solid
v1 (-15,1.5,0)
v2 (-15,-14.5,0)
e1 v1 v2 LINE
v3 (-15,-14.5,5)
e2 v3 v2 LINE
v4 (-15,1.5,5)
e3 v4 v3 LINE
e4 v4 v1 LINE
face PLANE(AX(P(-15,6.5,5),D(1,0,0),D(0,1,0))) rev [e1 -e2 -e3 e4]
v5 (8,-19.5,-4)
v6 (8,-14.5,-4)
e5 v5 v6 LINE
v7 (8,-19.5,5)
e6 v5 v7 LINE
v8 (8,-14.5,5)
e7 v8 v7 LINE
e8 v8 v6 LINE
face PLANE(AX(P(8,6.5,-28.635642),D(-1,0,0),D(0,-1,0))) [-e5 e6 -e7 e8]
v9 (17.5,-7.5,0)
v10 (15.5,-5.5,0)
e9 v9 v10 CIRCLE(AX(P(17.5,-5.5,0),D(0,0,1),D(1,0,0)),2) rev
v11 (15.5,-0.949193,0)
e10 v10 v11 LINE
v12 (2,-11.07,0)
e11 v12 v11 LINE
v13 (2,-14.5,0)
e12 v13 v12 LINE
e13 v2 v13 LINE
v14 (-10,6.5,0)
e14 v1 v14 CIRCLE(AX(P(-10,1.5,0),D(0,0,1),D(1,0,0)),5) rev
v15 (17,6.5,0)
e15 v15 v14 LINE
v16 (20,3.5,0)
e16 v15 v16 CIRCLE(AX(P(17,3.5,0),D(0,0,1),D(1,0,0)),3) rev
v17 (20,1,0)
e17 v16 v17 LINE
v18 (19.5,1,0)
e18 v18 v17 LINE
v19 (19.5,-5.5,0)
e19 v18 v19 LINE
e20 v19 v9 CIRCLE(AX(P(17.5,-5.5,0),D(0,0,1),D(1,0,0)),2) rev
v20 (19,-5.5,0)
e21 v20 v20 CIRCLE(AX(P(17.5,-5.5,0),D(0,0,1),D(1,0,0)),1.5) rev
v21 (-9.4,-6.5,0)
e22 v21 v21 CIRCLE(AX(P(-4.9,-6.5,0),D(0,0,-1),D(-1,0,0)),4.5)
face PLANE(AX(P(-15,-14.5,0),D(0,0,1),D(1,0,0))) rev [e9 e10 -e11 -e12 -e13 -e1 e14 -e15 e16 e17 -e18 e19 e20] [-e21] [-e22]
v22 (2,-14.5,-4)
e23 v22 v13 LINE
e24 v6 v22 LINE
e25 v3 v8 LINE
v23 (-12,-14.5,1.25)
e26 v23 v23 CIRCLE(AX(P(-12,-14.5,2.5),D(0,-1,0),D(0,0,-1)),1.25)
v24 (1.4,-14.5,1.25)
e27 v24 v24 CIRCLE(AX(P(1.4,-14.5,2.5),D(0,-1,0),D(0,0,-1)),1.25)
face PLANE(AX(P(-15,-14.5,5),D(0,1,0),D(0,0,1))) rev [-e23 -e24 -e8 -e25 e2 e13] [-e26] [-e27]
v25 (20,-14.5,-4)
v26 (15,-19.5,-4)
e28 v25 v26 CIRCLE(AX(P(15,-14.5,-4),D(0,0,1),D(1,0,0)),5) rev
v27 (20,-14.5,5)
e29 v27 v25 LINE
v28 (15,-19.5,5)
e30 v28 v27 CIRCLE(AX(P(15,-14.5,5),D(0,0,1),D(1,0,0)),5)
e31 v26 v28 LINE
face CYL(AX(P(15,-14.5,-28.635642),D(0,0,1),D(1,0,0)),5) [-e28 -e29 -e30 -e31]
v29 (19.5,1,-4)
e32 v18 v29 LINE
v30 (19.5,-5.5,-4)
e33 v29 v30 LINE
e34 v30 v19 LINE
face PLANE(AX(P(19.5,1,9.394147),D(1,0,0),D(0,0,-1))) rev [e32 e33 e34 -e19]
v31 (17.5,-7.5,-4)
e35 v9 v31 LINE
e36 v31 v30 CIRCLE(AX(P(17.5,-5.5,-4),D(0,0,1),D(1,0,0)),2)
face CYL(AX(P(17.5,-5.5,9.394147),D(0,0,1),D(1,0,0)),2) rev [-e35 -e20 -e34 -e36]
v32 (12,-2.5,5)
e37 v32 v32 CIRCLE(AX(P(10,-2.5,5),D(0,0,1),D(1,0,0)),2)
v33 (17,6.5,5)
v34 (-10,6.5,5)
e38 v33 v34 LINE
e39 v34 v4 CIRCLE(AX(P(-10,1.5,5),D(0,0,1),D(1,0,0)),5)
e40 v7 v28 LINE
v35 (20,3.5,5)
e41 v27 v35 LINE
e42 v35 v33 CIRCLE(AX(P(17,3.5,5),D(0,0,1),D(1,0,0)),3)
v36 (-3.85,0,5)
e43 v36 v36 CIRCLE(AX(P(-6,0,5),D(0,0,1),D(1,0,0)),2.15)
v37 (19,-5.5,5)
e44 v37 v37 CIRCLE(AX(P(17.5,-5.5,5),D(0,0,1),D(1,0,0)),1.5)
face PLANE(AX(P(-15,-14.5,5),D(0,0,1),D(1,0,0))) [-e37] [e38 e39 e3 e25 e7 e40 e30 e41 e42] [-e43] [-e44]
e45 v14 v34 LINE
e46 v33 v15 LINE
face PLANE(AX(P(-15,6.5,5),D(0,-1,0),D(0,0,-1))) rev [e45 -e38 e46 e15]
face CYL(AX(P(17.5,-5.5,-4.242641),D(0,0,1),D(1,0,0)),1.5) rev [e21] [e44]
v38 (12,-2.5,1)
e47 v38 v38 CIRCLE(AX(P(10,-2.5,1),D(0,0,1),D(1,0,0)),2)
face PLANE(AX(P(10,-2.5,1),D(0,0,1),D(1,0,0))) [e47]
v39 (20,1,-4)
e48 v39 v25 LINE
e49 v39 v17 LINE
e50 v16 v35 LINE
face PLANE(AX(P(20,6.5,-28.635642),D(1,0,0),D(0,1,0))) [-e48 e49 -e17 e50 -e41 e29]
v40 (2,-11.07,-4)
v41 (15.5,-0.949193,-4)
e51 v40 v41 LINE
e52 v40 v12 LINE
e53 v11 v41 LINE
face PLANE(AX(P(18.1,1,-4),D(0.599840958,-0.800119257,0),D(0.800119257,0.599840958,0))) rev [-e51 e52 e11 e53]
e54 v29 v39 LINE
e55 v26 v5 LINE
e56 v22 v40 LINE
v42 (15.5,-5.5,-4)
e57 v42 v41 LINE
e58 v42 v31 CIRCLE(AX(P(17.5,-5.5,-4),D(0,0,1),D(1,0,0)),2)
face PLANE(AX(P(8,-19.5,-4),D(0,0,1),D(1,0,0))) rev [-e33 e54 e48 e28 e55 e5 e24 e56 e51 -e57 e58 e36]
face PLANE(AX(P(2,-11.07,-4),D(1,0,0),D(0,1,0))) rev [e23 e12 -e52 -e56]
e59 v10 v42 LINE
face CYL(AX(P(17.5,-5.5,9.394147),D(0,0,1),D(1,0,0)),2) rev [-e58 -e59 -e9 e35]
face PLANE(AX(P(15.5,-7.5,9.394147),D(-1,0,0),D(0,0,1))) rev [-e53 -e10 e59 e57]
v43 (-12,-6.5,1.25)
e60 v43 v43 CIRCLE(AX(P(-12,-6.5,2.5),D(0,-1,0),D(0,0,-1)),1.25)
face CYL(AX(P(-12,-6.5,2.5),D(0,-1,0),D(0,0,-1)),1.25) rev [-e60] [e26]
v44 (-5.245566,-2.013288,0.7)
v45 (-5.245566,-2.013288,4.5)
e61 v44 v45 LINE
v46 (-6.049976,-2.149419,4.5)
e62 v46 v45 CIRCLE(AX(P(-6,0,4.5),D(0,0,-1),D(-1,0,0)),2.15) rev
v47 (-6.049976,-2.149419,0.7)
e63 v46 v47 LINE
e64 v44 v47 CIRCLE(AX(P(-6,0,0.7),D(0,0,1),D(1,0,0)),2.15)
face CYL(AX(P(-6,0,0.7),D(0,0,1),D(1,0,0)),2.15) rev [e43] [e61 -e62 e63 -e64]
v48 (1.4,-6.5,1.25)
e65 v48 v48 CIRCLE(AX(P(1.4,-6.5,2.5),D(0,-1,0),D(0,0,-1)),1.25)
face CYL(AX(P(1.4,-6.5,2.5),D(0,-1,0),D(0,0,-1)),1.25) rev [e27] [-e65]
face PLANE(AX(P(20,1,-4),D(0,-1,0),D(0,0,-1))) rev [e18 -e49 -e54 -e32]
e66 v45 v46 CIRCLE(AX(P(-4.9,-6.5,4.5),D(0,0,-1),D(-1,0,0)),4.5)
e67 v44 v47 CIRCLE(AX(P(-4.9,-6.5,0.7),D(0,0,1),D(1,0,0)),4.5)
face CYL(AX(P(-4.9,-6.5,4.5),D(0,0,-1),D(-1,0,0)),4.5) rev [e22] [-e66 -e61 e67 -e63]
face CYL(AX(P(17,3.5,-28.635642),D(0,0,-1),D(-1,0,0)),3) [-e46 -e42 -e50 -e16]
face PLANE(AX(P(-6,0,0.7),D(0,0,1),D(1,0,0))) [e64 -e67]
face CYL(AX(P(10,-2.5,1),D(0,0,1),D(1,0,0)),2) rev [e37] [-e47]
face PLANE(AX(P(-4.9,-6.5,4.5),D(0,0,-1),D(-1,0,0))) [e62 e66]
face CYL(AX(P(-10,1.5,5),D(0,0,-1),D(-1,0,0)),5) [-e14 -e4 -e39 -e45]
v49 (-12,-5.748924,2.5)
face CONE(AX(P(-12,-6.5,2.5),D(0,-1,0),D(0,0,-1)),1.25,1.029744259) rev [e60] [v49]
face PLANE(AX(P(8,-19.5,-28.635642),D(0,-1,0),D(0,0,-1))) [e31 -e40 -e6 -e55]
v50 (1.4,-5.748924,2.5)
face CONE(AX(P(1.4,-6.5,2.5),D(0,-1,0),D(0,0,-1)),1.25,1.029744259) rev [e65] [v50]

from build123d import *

# Parameters (mm, degrees)
SKETCH1_W             = 23
SKETCH1_H             = 21
EXTRUDE1_DEPTH        = 5
SKETCH2_R             = 2.15
EXTRUDE2_DEPTH        = 4.3
SKETCH3_R             = 4.5
EXTRUDE3_DEPTH        = 4.5
SKETCH4_R             = 1.25
EXTRUDE4_DEPTH        = 8
SKETCH7_W             = 12
SKETCH7_H             = 26
EXTRUDE6_DEPTH        = 5
SKETCH9_R             = 1.5
EXTRUDE8_DEPTH        = 5
SKETCH8_R             = 2
EXTRUDE7_DEPTH        = 4
FILLET2_R             = 3
M3_TAPPED_HOLE1_D     = 2.5
M3_TAPPED_HOLE1_DEPTH = 8
M3_TAPPED_HOLE1_TIP   = 0.751075774
EXTRUDE9_DEPTH        = 4
FILLET1_R             = 5
EXTRUDE10_DEPTH       = 4
FILLET3_R             = 2


with BuildPart() as part:
    # Sketch1 → Extrude1 (new body)
    with BuildSketch(Plane.XY):
        with Locations((-3.5, -4)):
            Rectangle(SKETCH1_W, SKETCH1_H)
    extrude(amount=EXTRUDE1_DEPTH)

    # Sketch2 → Extrude2 (cut)
    with BuildSketch(Plane.XY.offset(5)):
        with Locations((-6, 0)):
            Circle(SKETCH2_R)
    extrude(amount=-EXTRUDE2_DEPTH, mode=Mode.SUBTRACT)

    # Sketch3 → Extrude3 (cut)
    with BuildSketch(Plane(origin=(0, 0, 0), x_dir=(-1, 0, 0), z_dir=(0, 0, -1))):
        with Locations((4.9, -6.5)):
            Circle(SKETCH3_R)
    extrude(amount=-EXTRUDE3_DEPTH, mode=Mode.SUBTRACT)

    # Sketch4 → Extrude4 (cut)
    with BuildSketch(Plane.XZ.offset(14.5)):
        with Locations(Location((-12, 2.5, 0), (0, 0, 270))):
            Circle(SKETCH4_R)
        with Locations(Location((1.4, 2.5, 0), (0, 0, 270))):
            Circle(SKETCH4_R)
    extrude(amount=-EXTRUDE4_DEPTH, mode=Mode.SUBTRACT)

    # Sketch7 → Extrude6 (add)
    with BuildSketch(Plane.XY.offset(5)):
        with Locations((14, -6.5)):
            Rectangle(SKETCH7_W, SKETCH7_H)
    extrude(amount=-EXTRUDE6_DEPTH)

    # Sketch9 → Extrude8 (cut)
    with BuildSketch(Plane.XY.offset(5)):
        with Locations((17.5, -5.5)):
            Circle(SKETCH9_R)
    extrude(amount=-EXTRUDE8_DEPTH, mode=Mode.SUBTRACT)

    # Sketch8 → Extrude7 (cut)
    with BuildSketch(Plane.XY.offset(5)):
        with Locations((10, -2.5)):
            Circle(SKETCH8_R)
    extrude(amount=-EXTRUDE7_DEPTH, mode=Mode.SUBTRACT)

    # Fillet2
    fillet2_edges = [part.edges().sort_by_distance(p)[0] for p in [
        (20, 6.5, 2.5),
        (20, -19.5, 2.5),
    ]]
    fillet(fillet2_edges, radius=FILLET2_R)

    # M3 Tapped Hole1
    with Locations(Plane(origin=(-12, -14.5, 2.5), x_dir=(0, 0, -1), z_dir=(0, -1, 0))):
        with Locations((0, 0), (0, 13.4)):
            Hole(M3_TAPPED_HOLE1_D / 2, depth=M3_TAPPED_HOLE1_DEPTH)
            with Locations((0, 0, -(M3_TAPPED_HOLE1_DEPTH + M3_TAPPED_HOLE1_TIP / 2))):  # 118° drill point
                Cone(0, M3_TAPPED_HOLE1_D / 2, M3_TAPPED_HOLE1_TIP, mode=Mode.SUBTRACT)

    # Sketch11 → Extrude9 (add)
    with BuildSketch(Plane(origin=(0, 0, 0), x_dir=(-1, 0, 0), z_dir=(0, 0, -1))):
        Polygon((-8, -19.5), (-20, -19.5), (-20, 1), (-18.1, 1), (-2, -11.07), (-2, -14.5), (-8, -14.5), align=None)
    extrude(amount=EXTRUDE9_DEPTH)

    # Fillet1
    fillet1_edges = [part.edges().sort_by_distance(p)[0] for p in [
        (-15, 6.5, 2.5),
        (20, -19.5, -2),
    ]]
    fillet(fillet1_edges, radius=FILLET1_R)

    # Sketch12 → Extrude10 (cut)
    with BuildSketch(Plane(origin=(0, 0, -4), x_dir=(-1, 0, 0), z_dir=(0, 0, -1))):
        Polygon((-19.5, 1), (-19.5, -7.5), (-15.5, -7.5), (-15.5, -0.949192547), (-18.1, 1), align=None)
    extrude(amount=-EXTRUDE10_DEPTH, mode=Mode.SUBTRACT)

    # Fillet3
    fillet3_edges = [part.edges().sort_by_distance(p)[0] for p in [
        (15.5, -7.5, -2),
        (19.5, -7.5, -2),
    ]]
    fillet(fillet3_edges, radius=FILLET3_R - 0.0001)  # a hair under: the kernel refuses the full size


solid = part.part
